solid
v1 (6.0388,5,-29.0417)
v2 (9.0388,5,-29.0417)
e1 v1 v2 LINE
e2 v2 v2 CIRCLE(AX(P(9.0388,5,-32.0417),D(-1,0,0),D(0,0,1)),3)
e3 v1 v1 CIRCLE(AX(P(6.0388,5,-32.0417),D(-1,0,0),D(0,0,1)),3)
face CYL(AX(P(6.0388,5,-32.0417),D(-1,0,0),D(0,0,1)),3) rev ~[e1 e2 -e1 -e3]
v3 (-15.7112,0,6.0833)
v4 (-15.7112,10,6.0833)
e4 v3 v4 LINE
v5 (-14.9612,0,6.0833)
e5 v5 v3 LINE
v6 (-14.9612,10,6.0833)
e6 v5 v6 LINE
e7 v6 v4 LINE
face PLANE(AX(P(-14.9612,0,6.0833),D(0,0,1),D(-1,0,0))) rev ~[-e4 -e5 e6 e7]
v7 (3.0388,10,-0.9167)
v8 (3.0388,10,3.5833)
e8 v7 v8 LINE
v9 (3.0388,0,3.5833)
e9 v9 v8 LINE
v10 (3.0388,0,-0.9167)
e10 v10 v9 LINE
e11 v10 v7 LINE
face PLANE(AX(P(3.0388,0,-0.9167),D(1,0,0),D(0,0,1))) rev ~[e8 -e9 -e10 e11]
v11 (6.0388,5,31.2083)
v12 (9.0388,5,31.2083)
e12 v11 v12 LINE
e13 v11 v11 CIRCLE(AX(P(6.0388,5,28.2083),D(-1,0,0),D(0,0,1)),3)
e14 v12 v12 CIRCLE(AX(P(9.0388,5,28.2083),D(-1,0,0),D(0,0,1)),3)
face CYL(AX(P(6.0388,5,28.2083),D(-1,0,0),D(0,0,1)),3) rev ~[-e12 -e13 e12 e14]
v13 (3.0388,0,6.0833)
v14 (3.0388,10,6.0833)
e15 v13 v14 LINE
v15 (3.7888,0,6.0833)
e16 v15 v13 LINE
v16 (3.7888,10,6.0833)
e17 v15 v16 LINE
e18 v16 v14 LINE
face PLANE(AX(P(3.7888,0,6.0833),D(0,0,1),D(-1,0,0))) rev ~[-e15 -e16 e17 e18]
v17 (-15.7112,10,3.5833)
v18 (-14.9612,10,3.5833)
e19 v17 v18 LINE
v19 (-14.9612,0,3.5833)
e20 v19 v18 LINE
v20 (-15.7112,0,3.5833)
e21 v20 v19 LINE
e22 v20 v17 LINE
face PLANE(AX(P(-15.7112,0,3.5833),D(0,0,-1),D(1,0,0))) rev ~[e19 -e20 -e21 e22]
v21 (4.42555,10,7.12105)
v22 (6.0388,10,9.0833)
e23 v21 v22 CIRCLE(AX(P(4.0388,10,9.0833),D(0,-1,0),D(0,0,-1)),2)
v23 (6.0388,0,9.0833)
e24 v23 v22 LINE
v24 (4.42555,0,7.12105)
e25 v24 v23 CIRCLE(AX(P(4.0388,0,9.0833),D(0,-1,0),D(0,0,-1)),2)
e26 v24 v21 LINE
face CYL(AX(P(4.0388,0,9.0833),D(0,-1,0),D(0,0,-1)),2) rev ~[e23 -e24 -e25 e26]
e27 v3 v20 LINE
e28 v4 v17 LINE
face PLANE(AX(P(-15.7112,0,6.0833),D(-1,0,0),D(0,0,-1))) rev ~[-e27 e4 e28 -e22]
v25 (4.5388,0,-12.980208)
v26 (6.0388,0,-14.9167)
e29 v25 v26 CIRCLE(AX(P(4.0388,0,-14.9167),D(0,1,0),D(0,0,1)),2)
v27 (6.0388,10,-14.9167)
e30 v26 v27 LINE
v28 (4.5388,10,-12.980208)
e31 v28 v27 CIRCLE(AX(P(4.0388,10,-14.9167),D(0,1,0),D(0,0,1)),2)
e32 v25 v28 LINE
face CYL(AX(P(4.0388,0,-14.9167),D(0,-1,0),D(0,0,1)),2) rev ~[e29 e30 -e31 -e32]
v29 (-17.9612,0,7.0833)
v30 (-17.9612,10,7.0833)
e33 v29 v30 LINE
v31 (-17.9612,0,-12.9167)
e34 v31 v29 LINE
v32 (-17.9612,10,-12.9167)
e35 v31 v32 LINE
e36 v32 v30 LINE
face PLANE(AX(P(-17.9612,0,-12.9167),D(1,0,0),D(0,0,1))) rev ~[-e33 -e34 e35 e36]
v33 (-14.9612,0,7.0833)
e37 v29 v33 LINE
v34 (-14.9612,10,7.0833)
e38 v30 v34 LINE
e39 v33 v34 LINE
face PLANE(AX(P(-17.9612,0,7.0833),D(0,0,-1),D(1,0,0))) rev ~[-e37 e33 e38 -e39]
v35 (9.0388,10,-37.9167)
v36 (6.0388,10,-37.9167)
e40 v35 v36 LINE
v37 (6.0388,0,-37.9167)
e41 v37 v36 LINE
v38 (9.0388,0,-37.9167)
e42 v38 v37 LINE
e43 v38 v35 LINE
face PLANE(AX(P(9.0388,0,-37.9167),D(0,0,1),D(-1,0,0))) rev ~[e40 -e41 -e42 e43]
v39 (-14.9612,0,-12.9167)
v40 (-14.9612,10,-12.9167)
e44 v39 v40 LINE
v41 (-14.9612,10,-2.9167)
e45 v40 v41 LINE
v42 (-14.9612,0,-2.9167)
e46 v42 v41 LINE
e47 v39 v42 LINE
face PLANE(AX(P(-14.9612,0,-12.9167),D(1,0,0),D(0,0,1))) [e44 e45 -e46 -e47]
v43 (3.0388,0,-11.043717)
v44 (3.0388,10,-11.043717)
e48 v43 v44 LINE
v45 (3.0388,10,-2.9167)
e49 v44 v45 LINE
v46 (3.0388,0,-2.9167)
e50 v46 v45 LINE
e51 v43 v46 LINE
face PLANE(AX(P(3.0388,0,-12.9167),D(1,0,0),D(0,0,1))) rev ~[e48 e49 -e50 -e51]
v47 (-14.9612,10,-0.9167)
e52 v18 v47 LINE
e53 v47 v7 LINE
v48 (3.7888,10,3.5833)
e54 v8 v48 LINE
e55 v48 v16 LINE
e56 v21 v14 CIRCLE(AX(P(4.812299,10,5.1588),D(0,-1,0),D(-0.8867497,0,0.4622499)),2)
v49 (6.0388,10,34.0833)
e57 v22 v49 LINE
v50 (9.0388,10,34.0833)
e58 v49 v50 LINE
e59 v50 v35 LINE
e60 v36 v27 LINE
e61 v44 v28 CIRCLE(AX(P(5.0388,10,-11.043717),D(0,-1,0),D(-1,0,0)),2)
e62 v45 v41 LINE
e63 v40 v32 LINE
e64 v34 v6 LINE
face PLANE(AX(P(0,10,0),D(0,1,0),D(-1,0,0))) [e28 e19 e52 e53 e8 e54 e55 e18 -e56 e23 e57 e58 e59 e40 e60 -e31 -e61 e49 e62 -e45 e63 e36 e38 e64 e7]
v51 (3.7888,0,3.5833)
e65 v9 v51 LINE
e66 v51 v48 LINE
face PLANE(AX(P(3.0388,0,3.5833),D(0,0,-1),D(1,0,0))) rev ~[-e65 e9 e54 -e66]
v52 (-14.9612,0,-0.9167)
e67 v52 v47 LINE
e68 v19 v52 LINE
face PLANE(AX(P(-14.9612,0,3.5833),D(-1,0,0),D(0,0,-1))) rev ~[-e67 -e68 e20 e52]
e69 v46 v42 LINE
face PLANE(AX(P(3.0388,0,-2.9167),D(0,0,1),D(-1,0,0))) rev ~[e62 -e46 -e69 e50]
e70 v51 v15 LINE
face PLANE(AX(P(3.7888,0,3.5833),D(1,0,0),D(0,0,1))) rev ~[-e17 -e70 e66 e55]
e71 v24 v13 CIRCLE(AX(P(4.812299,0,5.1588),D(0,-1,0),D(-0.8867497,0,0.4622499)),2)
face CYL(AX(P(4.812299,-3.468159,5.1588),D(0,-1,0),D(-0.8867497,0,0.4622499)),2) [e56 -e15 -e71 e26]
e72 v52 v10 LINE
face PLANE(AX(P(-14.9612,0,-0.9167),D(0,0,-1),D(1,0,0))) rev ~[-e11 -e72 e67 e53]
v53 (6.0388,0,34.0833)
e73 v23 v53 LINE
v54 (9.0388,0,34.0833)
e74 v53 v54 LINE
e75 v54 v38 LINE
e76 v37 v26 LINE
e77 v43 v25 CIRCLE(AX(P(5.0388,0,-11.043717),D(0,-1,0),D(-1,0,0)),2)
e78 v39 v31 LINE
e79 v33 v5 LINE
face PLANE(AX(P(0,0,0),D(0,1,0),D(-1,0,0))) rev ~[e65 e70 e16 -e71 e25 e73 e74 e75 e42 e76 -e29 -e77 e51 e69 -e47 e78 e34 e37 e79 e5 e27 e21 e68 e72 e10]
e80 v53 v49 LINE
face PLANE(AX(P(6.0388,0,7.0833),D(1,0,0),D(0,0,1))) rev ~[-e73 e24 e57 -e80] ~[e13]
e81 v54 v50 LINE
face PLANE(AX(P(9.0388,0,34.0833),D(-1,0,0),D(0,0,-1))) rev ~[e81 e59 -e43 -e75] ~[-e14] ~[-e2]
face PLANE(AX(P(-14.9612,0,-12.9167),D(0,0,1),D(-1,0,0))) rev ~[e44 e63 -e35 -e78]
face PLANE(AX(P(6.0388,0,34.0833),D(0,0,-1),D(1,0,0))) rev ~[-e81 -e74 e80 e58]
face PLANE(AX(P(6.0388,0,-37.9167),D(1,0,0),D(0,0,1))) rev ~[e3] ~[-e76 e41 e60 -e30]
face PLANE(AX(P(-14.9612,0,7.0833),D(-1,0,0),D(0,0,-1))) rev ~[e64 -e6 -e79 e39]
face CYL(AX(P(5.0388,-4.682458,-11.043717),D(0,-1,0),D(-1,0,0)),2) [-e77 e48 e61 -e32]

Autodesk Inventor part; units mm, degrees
ref_plane "YZ Plane" through (0, 0, 0) normal (1, 0, 0) x (0, 1, 0)
ref_plane "XZ Plane" through (0, 0, 0) normal (0, 1, 0) x (-1, 0, 0)
ref_plane "XY Plane" through (0, 0, 0) normal (0, 0, 1) x (1, 0, 0)
sketch "Sketch1" plane through (0, 0, 0) normal (0, 1, 0) x (-1, 0, 0)
  line L0 (-3.0388, 7.0833) -> (-6.0388, 7.0833)
  line L1 (-6.0388, 7.0833) -> (-6.0388, -12.9167)
  line L2 (-6.0388, -12.9167) -> (-3.0388, -12.9167)
  line L3 (-3.0388, -12.9167) -> (-3.0388, -2.9167)
  line L4 (-3.0388, -2.9167) -> (14.9612, -2.9167)
  line L5 (14.9612, -12.9167) -> (17.9612, -12.9167)
  line L6 (17.9612, -12.9167) -> (17.9612, 7.0833)
  line L7 (17.9612, 7.0833) -> (14.9612, 7.0833)
  line L8 (14.9612, 7.0833) -> (14.9612, 6.0833)
  line L9 (14.9612, 6.0833) -> (15.7112, 6.0833)
  line L10 (15.7112, 6.0833) -> (15.7112, 3.5833)
  line L11 (15.7112, 3.5833) -> (14.9612, 3.5833)
  line L12 (14.9612, 3.5833) -> (14.9612, -0.9167)
  line L13 (14.9612, -0.9167) -> (-3.0388, -0.9167)
  line L14 (-3.0388, -0.9167) -> (-3.0388, 3.5833)
  line L15 (-3.7888, 3.5833) -> (-3.7888, 6.0833)
  line L16 (-3.7888, 6.0833) -> (-3.0388, 6.0833)
  line L17 (-3.0388, 3.5833) -> (-3.7888, 3.5833)
  line L18 (-3.0388, 6.0833) -> (-3.0388, 7.0833)
  line L19 (14.9612, -12.9167) -> (14.9612, -2.9167)
  line L20 (-6.0388, 7.0833) -> (-6.0388, 34.0833)
  line L21 (-6.0388, 34.0833) -> (-9.0388, 34.0833)
  line L22 (-9.0388, 34.0833) -> (-9.0388, -37.9167)
  line L23 (-9.0388, -37.9167) -> (-6.0388, -37.9167)
  line L24 (-6.0388, -37.9167) -> (-6.0388, -12.9167)
  point P0 (0, 0)
  point P1 (14.9612, 1.3333)
  dimension "d0" = 2.5
  dimension "d1" = 3
  dimension "d2" = 3
  dimension "d3" = 10
  dimension "d4" = 10
  dimension "d5" = 2
  dimension "d6" = 3
  dimension "d8" = 1
  dimension "d9" = 8
  dimension "d11" = 0.75
  dimension "d12" = 0.75
  dimension "d13" = 3
  dimension "d16" = 18
  dimension "d17" = 3
  dimension "d18" = 72
  dimension "d19" = 35
extrude "Extrusion1" add sketch "Sketch1" along normal blind 10
fillet "Fillet1" radius 2 4 edges at (6.0388, 5, 7.0833) (6.0388, 5, -12.9167) (3.0388, 5, -12.9167) (3.0388, 5, 7.0833)
sketch "Sketch2" plane through (6.0388, 0, 34.0833) normal (-1, 0, 0) x (0, 0, 1)
  circle A0 centre (-5.875, 5) radius 3
  circle A1 centre (-66.125, 5) radius 3
  line L0 (-72, 0) -> (-49, 0) projected
  line L1 (-72, 10) -> (-49, 10) projected
  line L2 (-25, 10) -> (0, 10) projected
  line L3 (0, 0) -> (0, 10) projected
  line L4 (-72, 0) -> (-72, 10) projected
  point P0 (-34.0833, 0)
  dimension "d21" = 6
  dimension "d22" = 6
  dimension "d23" = 10
  dimension "d24" = 5
  dimension "d25" = 5
  dimension "d26" = 60.25
  dimension "d27" = 72
  dimension "d28" = 5.875
extrude "Extrusion2" cut sketch "Sketch2" against normal through all
equation "\"d2\" = d1"
equation "\"d4\" = d3"
equation "\"d6\" = d2"
equation "\"d12\" = d11"
equation "\"d13\" = d1"
equation "\"d19\" = -0.5 * d5 + 0.5 * d18"
equation "\"d24\" = 0.5 * d23"
equation "\"d25\" = 0.5 * d23"
equation "\"d28\" = -0.5 * d26 + 0.5 * d27"
properties part number "CO-1-01-stepperControllerMount"
